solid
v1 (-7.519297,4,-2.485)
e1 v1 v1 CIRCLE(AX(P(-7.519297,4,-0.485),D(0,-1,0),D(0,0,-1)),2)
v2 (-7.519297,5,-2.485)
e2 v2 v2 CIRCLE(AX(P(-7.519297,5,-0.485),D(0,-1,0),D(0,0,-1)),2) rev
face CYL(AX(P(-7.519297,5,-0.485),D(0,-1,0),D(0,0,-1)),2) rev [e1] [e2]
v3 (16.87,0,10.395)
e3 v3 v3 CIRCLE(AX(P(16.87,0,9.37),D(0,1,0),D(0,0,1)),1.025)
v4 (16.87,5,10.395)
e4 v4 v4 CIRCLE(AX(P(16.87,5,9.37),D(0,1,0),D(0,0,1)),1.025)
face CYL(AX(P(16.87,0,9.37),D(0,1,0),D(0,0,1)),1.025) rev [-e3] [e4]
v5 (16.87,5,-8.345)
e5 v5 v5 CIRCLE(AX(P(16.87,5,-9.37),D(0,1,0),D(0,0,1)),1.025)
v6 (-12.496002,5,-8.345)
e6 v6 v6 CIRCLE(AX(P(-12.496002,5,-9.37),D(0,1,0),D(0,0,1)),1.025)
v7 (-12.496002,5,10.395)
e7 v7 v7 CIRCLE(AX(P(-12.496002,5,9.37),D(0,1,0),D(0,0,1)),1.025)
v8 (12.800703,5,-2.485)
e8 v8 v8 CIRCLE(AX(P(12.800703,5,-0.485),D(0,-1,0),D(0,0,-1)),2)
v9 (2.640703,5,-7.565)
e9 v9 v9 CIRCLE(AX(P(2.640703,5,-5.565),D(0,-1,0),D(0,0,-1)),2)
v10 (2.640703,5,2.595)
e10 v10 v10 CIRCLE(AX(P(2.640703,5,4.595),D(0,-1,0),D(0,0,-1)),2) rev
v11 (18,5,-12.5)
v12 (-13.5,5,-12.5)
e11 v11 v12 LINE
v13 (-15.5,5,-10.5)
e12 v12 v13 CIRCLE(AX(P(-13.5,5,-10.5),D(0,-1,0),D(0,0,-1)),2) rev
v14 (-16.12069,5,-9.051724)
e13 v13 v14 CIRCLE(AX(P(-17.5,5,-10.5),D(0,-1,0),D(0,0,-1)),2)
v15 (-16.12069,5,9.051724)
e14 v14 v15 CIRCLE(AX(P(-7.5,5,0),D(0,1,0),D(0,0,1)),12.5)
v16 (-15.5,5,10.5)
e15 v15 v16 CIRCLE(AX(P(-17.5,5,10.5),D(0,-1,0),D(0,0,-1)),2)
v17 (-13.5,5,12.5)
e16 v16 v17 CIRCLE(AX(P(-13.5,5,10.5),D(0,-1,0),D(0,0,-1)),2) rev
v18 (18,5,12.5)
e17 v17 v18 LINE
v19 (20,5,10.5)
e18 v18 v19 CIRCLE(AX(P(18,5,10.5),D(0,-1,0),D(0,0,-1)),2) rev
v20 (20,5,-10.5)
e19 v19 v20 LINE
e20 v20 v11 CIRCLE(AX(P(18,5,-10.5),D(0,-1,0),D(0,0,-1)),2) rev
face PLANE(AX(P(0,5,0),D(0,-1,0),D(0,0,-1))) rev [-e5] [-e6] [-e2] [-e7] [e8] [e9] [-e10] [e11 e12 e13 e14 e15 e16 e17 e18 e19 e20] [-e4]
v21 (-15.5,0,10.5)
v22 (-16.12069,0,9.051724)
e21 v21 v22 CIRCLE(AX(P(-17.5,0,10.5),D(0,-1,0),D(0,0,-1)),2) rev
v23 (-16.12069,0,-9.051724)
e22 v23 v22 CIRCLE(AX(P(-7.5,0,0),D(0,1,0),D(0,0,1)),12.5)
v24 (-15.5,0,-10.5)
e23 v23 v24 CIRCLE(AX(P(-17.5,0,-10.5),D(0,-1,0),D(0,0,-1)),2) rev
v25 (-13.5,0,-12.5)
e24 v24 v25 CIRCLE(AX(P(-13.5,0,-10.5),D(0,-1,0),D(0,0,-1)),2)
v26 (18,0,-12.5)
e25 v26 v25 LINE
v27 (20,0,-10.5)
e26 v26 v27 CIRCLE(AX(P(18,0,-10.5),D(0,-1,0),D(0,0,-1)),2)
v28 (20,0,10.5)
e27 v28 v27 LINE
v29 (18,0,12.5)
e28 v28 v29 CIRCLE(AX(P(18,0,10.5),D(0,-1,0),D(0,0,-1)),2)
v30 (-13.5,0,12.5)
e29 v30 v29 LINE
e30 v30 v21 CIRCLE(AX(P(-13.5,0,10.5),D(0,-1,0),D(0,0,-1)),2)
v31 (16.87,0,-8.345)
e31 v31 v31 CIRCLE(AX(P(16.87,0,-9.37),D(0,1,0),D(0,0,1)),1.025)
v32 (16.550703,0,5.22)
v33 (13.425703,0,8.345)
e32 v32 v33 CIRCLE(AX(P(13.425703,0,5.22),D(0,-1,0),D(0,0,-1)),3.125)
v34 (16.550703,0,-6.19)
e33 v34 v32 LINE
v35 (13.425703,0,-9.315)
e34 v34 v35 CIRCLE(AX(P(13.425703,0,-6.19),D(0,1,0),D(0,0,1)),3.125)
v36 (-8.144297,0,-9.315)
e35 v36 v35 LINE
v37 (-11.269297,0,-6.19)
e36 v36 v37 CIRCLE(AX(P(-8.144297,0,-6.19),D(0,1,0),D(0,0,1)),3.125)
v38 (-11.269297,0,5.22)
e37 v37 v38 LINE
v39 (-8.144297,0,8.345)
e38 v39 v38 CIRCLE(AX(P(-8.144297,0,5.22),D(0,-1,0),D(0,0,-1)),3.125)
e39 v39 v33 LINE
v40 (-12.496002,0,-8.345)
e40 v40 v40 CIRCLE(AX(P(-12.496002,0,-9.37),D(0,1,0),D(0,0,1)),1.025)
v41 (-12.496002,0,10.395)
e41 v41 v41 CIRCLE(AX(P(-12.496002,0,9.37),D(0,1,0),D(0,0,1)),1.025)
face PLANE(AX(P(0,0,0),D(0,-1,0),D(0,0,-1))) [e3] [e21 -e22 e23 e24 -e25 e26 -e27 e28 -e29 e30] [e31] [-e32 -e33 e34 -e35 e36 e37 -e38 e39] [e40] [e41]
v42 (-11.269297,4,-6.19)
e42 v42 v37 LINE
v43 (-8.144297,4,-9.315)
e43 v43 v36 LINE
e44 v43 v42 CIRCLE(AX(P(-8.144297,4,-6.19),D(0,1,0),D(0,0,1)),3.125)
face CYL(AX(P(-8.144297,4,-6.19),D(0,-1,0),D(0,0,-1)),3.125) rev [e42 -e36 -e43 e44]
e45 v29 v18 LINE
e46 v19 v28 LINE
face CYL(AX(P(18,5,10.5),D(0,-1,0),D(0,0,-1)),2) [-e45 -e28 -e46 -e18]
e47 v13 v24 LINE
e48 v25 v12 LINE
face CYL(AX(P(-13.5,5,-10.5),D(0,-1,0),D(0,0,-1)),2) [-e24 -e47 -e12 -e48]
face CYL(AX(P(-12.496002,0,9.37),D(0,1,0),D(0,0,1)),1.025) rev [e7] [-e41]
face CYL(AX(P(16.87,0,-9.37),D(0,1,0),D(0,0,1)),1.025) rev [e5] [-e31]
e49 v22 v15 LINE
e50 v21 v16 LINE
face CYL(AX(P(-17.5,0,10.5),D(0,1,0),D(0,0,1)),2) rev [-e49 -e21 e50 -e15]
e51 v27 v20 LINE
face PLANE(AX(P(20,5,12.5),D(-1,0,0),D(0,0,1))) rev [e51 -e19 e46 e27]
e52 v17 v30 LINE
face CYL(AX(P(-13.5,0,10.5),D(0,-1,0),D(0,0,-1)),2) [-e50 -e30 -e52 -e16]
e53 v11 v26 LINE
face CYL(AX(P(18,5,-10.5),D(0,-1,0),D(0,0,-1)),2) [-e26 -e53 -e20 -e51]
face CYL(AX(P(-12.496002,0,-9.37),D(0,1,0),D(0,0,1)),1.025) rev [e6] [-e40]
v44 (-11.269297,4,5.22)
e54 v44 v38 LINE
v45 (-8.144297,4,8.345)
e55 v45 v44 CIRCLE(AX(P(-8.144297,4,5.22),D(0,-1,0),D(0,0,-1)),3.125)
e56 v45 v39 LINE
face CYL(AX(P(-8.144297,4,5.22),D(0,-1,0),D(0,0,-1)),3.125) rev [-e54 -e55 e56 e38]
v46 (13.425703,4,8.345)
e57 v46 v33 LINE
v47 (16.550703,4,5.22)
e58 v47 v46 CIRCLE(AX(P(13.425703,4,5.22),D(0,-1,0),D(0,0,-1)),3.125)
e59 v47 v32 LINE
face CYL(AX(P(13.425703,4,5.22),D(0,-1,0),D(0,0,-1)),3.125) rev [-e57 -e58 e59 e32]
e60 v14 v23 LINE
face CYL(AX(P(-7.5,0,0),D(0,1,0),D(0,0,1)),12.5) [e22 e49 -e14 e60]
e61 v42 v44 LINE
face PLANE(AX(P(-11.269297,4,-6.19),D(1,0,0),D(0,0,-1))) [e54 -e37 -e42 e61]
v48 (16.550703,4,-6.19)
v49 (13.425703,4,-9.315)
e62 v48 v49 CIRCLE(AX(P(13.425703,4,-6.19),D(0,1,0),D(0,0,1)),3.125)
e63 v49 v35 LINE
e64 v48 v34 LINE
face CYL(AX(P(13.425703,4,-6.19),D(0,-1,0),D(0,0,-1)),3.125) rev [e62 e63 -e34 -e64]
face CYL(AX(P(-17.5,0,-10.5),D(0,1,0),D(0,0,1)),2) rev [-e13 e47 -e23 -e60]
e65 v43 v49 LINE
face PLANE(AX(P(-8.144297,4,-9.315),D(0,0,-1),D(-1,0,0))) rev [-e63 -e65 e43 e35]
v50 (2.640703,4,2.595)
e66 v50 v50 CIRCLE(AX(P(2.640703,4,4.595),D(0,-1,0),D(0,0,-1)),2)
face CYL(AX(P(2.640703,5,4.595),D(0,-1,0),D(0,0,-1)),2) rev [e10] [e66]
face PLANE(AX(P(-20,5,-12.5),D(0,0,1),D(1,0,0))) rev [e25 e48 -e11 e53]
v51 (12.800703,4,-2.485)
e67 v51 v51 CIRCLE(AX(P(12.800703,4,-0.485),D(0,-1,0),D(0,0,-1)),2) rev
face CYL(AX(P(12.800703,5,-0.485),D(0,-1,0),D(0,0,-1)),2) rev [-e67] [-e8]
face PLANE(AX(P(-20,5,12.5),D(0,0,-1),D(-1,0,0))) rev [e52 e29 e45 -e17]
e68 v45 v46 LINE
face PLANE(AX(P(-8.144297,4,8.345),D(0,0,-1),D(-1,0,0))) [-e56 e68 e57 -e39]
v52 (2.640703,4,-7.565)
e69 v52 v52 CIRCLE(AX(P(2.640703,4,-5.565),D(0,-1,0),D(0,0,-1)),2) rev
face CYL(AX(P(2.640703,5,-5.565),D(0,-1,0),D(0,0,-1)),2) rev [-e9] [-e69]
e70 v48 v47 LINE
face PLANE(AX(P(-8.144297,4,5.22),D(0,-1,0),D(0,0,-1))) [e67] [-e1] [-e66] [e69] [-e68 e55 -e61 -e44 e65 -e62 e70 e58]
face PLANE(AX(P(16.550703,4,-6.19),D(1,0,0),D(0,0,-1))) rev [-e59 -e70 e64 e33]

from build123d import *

# Parameters (mm, degrees)
SKETCH1_W           = 40
SKETCH1_H           = 25
BOSS_EXTRUDE1_DEPTH = 5
CUT_EXTRUDE1_DEPTH  = 25.109126902
SKETCH4_W           = 8
SKETCH4_H           = 25
BOSS_EXTRUDE2_DEPTH = 5
FILLET1_R           = 2
SKETCH5_R           = 1.025
CUT_EXTRUDE2_DEPTH  = 25.109126902
SKETCH6_R           = 2
CUT_EXTRUDE3_DEPTH  = 25.109126902
CUT_EXTRUDE4_DEPTH  = 4


with BuildPart() as part:
    # Sketch1 → Boss-Extrude1 (new body)
    with BuildSketch(Plane(origin=(0, 0, 0), x_dir=(1, 0, 0), z_dir=(0, 1, 0))):
        Rectangle(SKETCH1_W, SKETCH1_H)
    extrude(amount=BOSS_EXTRUDE1_DEPTH)

    # Sketch2 → Cut-Extrude1 (cut, through all)
    with BuildSketch(Plane(origin=(0, 5, 0), x_dir=(1, 0, 0), z_dir=(0, 1, 0))):
        with BuildLine():
            ThreePointArc((-20, 0), (-16.338834759, 8.83883477), (-7.499999984, 12.5))
            Line((-7.499999984, 12.5), (-20, 12.5))
            Line((-20, 12.5), (-20, 0))
        make_face()
        with BuildLine():
            Line((-20, -12.5), (-7.50000001, -12.5))
            ThreePointArc((-7.50000001, -12.5), (-16.338834768, -8.838834761), (-20, 0))
            Line((-20, 0), (-20, -12.5))
        make_face()
    extrude(amount=-CUT_EXTRUDE1_DEPTH, mode=Mode.SUBTRACT)

    # Sketch4 → Boss-Extrude2 (add, through all)
    with BuildSketch(Plane(origin=(0, 5, 0), x_dir=(1, 0, 0), z_dir=(0, 1, 0))):
        with Locations((-11.5, 0)):
            Rectangle(SKETCH4_W, SKETCH4_H)
    extrude(amount=-BOSS_EXTRUDE2_DEPTH)

    # Fillet1
    fillet1_edges = [part.edges().sort_by_distance(p)[0] for p in [
        (20, 2.5, 12.5),
        (20, 2.5, -12.5),
        (-15.5, 2.5, -12.5),
        (-15.5, 2.5, 12.5),
        (-15.5, 2.5, 9.604686356),
        (-15.5, 2.5, -9.604686356),
    ]]
    fillet(fillet1_edges, radius=FILLET1_R - 0.0001)  # a hair under: the kernel refuses the full size

    # Sketch5 → Cut-Extrude2 (cut, through all)
    with BuildSketch(Plane(origin=(0, 5, 0), x_dir=(1, 0, 0), z_dir=(0, 1, 0))):
        with Locations(Location((-12.496001599, 9.37, 0), (0, 0, 270))):
            Circle(SKETCH5_R)
        with Locations(Location((-12.496001599, -9.37, 0), (0, 0, 270))):
            Circle(SKETCH5_R)
        with Locations(Location((16.87, 9.37, 0), (0, 0, 270))):
            Circle(SKETCH5_R)
        with Locations(Location((16.87, -9.37, 0), (0, 0, 270))):
            Circle(SKETCH5_R)
    extrude(amount=-CUT_EXTRUDE2_DEPTH, mode=Mode.SUBTRACT)

    # Sketch6 → Cut-Extrude3 (cut, through all)
    with BuildSketch(Plane.XZ):
        with Locations(Location((-7.519296648, -0.485, 0), (0, 0, 270))):
            Circle(SKETCH6_R)
        with Locations(Location((2.640703352, 4.595, 0), (0, 0, 270))):
            Circle(SKETCH6_R)
        with Locations(Location((12.800703352, -0.485, 0), (0, 0, 270))):
            Circle(SKETCH6_R)
        with Locations(Location((2.640703352, -5.565, 0), (0, 0, 270))):
            Circle(SKETCH6_R)
    extrude(amount=-CUT_EXTRUDE3_DEPTH, mode=Mode.SUBTRACT)

    # Sketch7 → Cut-Extrude4 (cut)
    with BuildSketch(Plane.XZ):
        with BuildLine():
            Line((-11.269296648, -6.19), (-11.269296648, 5.22))
            ThreePointArc((-11.269296648, 5.22), (-10.354005339, 7.429708691), (-8.144296648, 8.345))
            Line((-8.144296648, 8.345), (13.425703352, 8.345))
            ThreePointArc((13.425703352, 8.345), (15.635412043, 7.429708691), (16.550703352, 5.22))
            Line((16.550703352, 5.22), (16.550703352, -6.19))
            ThreePointArc((16.550703352, -6.19), (15.635412043, -8.399708691), (13.425703352, -9.315))
            Line((13.425703352, -9.315), (-8.144296648, -9.315))
            ThreePointArc((-8.144296648, -9.315), (-10.354005339, -8.399708691), (-11.269296648, -6.19))
        make_face()
    extrude(amount=-CUT_EXTRUDE4_DEPTH, mode=Mode.SUBTRACT)


solid = part.part
